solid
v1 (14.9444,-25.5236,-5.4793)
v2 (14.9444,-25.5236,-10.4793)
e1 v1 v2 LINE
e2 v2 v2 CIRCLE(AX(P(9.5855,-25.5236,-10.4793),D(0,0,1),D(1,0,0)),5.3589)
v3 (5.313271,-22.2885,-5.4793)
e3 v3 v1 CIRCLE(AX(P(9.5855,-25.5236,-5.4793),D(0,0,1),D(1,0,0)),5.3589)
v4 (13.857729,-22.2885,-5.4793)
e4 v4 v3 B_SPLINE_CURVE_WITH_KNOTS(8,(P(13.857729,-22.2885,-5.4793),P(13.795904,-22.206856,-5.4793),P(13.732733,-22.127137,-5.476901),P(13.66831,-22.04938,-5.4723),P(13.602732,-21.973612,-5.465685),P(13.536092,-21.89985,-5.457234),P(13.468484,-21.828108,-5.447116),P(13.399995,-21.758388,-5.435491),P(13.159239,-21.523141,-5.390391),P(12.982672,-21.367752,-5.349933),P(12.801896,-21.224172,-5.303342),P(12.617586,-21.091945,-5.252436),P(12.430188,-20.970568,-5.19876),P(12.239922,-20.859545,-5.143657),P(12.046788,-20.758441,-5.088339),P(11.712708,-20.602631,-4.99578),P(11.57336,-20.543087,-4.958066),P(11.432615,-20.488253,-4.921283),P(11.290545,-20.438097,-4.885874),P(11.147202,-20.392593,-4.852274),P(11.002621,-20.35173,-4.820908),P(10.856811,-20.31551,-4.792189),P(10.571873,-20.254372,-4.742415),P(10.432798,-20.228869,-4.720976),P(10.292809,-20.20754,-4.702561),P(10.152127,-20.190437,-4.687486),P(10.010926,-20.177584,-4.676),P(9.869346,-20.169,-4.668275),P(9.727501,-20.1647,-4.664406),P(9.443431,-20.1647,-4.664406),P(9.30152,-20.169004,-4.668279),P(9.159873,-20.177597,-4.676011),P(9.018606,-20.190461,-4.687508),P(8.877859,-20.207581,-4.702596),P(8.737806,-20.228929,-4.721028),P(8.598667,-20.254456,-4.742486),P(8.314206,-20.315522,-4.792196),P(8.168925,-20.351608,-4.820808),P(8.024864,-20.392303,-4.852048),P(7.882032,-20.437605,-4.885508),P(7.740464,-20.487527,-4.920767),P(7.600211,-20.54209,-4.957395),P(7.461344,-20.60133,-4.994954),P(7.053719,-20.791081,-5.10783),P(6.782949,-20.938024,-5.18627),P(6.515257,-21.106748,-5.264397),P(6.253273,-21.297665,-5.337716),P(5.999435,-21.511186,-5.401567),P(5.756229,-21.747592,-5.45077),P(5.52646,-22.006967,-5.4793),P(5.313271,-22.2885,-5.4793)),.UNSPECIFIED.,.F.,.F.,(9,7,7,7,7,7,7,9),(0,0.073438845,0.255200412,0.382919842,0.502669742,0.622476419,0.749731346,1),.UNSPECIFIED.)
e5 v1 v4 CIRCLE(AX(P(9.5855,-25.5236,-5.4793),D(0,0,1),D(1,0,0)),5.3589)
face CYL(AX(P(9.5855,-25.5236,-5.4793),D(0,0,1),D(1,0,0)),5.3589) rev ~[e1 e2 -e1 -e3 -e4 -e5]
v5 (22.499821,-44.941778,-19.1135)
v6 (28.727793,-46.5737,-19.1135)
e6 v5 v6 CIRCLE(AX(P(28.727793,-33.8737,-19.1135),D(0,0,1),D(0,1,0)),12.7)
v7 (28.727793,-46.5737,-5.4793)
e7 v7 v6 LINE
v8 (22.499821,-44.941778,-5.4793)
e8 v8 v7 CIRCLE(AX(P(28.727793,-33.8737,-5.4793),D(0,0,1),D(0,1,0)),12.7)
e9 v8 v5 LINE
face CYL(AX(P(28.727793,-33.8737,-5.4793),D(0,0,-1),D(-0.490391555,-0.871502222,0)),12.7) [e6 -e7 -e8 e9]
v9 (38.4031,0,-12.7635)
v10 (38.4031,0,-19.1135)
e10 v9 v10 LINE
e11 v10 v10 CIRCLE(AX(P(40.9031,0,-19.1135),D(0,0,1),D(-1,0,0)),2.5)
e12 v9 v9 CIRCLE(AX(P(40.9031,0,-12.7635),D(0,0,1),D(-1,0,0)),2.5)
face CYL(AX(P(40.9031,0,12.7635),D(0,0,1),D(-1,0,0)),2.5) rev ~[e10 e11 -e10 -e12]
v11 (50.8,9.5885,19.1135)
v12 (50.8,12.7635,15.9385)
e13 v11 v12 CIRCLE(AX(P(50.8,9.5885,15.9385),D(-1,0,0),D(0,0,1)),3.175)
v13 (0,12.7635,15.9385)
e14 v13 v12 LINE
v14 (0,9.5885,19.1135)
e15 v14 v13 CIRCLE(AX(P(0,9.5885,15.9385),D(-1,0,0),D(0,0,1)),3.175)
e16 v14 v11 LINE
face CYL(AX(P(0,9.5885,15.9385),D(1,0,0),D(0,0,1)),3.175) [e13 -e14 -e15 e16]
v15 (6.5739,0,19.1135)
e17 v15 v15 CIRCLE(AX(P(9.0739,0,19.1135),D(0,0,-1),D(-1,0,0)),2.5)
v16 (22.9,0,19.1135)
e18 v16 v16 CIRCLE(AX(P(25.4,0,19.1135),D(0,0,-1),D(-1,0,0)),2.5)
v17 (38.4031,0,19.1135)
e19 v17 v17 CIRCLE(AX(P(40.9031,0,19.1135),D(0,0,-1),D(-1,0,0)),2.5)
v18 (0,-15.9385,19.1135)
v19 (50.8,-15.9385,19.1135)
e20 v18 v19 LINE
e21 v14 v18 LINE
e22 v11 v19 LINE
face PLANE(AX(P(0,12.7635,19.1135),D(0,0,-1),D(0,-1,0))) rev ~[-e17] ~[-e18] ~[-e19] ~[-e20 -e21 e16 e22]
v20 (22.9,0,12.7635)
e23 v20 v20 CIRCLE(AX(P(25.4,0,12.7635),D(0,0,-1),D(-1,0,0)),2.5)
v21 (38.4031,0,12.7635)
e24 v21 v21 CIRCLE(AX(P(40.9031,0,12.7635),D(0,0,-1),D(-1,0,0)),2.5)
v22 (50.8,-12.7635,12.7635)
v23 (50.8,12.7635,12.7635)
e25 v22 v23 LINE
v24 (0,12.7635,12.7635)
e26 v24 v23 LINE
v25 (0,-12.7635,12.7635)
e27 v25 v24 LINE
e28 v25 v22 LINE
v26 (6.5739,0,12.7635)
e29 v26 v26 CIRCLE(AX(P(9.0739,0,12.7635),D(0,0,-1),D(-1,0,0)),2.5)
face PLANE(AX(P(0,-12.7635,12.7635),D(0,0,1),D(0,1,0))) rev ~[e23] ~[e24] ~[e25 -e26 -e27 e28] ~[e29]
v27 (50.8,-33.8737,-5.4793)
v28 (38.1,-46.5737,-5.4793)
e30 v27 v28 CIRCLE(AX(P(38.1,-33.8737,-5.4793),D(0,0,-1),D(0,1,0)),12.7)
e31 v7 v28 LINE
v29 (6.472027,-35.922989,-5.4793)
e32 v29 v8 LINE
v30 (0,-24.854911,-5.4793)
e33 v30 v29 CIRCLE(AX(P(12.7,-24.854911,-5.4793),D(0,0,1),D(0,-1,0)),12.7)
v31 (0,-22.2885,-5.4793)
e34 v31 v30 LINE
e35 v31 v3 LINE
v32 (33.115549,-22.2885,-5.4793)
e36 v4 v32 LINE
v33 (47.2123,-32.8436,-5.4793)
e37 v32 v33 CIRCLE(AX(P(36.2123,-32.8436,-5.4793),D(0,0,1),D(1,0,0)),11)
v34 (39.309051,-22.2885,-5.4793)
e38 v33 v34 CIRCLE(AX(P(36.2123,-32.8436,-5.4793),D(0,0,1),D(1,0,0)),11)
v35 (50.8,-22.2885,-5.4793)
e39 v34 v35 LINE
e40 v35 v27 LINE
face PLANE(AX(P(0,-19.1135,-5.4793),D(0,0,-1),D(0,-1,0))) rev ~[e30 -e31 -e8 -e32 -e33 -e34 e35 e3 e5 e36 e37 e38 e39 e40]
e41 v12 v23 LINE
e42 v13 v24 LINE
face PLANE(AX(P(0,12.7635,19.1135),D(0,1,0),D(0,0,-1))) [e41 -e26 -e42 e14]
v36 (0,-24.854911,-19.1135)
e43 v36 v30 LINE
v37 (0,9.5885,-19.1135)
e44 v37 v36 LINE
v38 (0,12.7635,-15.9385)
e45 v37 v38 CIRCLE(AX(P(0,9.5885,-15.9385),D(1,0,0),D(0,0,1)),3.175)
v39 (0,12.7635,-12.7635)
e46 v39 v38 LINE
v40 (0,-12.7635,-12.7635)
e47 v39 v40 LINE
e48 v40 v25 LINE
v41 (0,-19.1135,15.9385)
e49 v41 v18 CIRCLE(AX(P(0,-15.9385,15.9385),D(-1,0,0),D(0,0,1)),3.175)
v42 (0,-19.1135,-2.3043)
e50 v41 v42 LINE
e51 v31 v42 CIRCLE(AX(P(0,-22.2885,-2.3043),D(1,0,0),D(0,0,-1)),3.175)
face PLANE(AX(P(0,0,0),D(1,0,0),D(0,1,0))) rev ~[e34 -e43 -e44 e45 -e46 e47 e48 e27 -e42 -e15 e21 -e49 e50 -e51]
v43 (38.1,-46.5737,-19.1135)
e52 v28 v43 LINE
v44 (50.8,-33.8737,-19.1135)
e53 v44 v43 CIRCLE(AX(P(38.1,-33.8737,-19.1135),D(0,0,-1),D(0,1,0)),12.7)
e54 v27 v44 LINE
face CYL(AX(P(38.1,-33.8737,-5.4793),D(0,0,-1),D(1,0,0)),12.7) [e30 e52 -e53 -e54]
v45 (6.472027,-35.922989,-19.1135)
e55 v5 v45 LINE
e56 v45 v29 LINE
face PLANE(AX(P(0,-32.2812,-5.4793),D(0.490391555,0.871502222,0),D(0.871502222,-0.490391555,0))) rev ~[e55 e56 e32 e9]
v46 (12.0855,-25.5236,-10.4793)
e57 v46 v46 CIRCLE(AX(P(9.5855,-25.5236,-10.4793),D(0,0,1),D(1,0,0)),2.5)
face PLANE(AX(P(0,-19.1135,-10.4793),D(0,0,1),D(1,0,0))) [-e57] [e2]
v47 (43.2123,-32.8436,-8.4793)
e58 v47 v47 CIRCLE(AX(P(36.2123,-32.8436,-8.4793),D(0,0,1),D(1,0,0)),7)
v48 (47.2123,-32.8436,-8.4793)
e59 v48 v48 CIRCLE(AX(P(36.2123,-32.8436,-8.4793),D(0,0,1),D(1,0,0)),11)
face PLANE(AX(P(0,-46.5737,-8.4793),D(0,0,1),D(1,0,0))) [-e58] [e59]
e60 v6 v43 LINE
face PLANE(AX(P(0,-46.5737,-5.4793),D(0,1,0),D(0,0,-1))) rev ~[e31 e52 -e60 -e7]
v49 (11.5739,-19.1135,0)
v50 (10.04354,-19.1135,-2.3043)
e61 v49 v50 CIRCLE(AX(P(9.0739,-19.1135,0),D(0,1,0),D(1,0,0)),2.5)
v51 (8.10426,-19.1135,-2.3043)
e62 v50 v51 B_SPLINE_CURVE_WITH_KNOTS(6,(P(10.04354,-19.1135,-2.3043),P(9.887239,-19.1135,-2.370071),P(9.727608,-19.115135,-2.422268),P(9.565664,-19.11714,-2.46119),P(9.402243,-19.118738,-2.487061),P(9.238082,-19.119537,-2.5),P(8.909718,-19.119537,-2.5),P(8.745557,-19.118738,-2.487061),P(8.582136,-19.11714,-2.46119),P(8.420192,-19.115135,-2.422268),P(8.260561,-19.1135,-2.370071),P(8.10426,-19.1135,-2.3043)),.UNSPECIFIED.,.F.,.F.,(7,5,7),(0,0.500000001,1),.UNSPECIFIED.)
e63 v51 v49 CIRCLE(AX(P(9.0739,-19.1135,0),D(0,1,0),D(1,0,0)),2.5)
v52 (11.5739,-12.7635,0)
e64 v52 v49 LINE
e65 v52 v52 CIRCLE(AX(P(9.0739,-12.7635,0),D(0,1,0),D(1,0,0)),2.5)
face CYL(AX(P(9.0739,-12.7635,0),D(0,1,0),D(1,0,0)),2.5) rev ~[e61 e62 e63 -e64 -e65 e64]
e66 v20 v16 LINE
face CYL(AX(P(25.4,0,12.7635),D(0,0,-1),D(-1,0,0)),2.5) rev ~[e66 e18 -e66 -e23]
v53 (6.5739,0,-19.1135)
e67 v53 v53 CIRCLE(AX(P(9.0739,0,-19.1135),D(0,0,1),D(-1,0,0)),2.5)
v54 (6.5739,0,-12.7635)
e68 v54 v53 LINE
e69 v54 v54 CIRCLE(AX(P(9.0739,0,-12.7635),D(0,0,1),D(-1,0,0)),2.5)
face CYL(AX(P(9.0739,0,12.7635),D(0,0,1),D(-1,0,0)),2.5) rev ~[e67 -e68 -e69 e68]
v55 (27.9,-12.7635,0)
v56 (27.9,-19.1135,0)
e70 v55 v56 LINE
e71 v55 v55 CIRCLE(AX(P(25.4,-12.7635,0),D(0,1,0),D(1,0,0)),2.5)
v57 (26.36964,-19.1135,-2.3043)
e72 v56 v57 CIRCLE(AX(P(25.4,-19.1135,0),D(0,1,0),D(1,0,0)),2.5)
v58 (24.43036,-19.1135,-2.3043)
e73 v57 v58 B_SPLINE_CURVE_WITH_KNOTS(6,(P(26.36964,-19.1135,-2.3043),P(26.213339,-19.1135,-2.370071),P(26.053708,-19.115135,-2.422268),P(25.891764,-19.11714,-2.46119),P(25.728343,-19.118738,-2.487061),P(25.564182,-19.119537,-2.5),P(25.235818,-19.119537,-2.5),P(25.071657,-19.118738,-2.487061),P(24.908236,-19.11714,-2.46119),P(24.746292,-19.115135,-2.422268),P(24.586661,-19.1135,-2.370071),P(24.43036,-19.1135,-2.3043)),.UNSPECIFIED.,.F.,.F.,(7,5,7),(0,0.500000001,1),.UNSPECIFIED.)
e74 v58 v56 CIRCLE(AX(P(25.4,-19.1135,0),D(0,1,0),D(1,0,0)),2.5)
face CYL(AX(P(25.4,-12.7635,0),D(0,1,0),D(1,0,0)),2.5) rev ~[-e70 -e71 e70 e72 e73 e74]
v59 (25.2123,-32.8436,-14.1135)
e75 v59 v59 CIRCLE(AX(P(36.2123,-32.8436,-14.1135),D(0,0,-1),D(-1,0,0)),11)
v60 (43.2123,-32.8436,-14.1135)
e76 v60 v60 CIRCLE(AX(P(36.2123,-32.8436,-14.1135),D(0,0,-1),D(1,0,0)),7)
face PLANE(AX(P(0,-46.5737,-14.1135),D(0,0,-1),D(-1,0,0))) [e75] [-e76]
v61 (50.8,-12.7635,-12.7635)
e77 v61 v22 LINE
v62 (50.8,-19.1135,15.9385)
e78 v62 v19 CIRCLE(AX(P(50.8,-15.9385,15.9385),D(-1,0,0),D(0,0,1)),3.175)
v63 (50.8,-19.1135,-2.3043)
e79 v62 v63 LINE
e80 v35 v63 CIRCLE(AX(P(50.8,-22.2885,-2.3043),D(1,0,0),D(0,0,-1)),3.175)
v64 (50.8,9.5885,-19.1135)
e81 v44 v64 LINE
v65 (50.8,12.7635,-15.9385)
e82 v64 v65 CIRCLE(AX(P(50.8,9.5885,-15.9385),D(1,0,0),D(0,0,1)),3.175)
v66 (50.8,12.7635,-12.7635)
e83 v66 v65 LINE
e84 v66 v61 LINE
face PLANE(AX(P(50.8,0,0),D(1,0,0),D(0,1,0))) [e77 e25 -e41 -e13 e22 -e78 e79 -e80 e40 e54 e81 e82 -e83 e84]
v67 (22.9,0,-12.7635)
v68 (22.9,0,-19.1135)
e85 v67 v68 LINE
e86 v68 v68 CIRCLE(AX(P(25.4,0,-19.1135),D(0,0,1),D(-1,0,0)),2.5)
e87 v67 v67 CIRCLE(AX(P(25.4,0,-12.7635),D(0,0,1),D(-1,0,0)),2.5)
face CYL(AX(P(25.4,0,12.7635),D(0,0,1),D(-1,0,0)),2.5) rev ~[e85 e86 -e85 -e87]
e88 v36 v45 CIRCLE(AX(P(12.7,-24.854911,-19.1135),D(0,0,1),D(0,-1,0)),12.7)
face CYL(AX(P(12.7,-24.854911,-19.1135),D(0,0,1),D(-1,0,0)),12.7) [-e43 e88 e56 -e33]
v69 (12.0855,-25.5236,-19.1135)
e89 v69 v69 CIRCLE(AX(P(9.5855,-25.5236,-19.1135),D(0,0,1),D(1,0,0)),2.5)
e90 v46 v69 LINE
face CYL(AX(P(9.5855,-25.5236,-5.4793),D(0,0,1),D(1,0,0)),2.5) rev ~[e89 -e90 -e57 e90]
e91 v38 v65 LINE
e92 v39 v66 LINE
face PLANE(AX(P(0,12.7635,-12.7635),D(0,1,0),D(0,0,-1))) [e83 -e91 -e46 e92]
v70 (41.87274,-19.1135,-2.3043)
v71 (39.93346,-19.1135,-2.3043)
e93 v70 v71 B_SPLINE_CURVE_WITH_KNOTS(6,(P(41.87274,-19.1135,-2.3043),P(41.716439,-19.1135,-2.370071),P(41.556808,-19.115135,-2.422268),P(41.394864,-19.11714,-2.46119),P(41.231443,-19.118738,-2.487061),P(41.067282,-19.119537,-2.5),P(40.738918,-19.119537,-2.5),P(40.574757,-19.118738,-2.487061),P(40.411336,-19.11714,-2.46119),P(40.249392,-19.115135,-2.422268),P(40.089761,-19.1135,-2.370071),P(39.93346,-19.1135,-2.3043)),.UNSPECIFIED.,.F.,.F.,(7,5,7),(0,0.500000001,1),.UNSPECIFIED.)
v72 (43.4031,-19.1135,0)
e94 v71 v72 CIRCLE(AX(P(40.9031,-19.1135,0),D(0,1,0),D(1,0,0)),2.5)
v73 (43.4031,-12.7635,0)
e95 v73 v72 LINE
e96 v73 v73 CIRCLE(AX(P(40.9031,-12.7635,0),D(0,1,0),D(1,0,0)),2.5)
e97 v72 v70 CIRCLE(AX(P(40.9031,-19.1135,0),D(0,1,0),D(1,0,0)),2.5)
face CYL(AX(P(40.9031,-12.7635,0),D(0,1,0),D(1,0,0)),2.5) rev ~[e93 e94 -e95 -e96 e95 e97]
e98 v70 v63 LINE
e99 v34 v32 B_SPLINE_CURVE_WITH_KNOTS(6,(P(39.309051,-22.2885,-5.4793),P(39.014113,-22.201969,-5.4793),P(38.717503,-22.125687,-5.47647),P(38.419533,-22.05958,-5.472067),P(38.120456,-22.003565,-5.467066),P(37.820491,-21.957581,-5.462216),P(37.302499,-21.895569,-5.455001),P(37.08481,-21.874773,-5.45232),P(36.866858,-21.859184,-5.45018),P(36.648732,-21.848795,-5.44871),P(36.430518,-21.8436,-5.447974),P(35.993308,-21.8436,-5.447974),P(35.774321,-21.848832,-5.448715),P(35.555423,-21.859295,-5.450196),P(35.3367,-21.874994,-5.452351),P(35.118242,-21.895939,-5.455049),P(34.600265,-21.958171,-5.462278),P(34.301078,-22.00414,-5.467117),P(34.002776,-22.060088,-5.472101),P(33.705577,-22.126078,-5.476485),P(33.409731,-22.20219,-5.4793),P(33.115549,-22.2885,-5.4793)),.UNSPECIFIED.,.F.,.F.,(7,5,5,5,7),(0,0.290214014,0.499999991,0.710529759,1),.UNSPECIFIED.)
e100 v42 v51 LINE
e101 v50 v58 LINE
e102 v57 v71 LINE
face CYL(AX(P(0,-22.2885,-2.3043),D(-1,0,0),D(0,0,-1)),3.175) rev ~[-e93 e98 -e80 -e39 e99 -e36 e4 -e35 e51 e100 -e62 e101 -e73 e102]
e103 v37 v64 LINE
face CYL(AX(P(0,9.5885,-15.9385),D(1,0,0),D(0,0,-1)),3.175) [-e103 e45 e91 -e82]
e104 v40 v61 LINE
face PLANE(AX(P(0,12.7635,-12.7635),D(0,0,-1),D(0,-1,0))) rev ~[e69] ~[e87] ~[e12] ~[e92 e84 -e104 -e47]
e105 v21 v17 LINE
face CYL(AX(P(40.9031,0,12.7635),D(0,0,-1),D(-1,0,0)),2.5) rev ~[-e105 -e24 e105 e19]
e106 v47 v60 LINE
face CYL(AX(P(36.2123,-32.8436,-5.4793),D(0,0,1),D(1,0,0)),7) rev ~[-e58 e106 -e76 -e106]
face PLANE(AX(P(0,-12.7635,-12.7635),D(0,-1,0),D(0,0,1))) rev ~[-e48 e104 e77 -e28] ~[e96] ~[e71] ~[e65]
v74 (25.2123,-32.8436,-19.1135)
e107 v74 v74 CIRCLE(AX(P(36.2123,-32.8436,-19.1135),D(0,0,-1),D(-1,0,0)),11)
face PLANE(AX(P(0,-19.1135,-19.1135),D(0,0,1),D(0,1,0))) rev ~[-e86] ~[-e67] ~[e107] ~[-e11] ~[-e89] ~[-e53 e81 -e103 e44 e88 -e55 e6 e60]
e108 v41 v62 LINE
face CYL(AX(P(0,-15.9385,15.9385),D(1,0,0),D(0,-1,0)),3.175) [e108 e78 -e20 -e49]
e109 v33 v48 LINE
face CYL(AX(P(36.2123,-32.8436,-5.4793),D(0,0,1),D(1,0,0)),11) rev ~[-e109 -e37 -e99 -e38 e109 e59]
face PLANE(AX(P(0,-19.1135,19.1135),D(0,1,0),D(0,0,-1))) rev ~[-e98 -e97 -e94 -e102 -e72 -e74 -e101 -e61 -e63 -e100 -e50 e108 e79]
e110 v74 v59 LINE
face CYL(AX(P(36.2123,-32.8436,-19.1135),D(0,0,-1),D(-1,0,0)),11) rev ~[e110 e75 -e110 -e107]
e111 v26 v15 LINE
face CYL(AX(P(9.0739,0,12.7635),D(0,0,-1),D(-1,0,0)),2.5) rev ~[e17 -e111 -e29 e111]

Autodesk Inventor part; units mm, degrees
ref_plane "YZ Plane" through (0, 0, 0) normal (1, 0, 0) x (0, 1, 0)
ref_plane "XZ Plane" through (0, 0, 0) normal (0, 1, 0) x (-1, 0, 0)
ref_plane "XY Plane" through (0, 0, 0) normal (0, 0, 1) x (1, 0, 0)
sketch "Sketch1" plane through (0, 0, 0) normal (1, 0, 0) x (0, 1, 0)
  line L0 (-12.7635, 12.7635) -> (12.7635, 12.7635)
  line L1 (12.7635, 12.7635) -> (12.7635, -12.7635)
  line L2 (12.7635, -12.7635) -> (-12.7635, -12.7635)
  line L3 (-12.7635, -12.7635) -> (-12.7635, 12.7635)
  line L4 (-12.7635, 12.7635) -> (12.7635, -12.7635) construction
  line L5 (12.7635, 12.7635) -> (-12.7635, -12.7635) construction
  line L6 (19.1135, 19.1135) -> (-19.1135, 19.1135)
  line L7 (-19.1135, 19.1135) -> (-19.1135, -19.1135)
  line L8 (-19.1135, -19.1135) -> (19.1135, -19.1135)
  line L9 (19.1135, -19.1135) -> (19.1135, 19.1135)
  line L10 (12.7635, 19.1135) -> (12.7635, -19.1135)
  line L11 (-19.1135, -5.4793) -> (-46.5737, -5.4793)
  line L12 (-46.5737, -5.4793) -> (-46.5737, -19.1135)
  line L13 (-46.5737, -19.1135) -> (-19.1135, -19.1135)
  line L14 (-19.1135, -19.1135) -> (-19.1135, -5.4793)
  point P0 (0, 0)
  point P1 (12.7635, 12.7635)
  dimension "d1" = 25.527
  dimension "d2" = 6.35
extrude "Extrusion1" add sketch "Sketch1" along normal blind 50.8 contours L3 L2 L10 L8 L7 L6 L0 | L13 L12 L11 L7
sketch "Sketch2" plane through (0, -46.5737, -5.4793) normal (0, 0, 1) x (1, 0, 0)
  line L0 (0, 27.4602) -> (0, 0) projected
  line L1 (0, 0) -> (50.8, 0) projected
  line L2 (50.8, 27.4602) -> (50.8, 0) projected
  line L3 (0, 27.4602) -> (50.8, 27.4602) projected
  circle A0 centre (36.2123, 13.7301) radius 7
  point P0 (0, 46.5737)
  dimension "d5" = 14
extrude "Extrusion2" cut sketch "Sketch2" against normal through all contours A0
sketch "Sketch3" plane through (0, -46.5737, -19.1135) normal (0, 0, -1) x (-1, 0, 0)
  circle A0 centre (-36.2123, 13.7301) radius 7 projected
  circle A1 centre (-36.2123, 13.7301) radius 11
  point P0 (0, 46.5737)
  dimension "d8" = 22
extrude "Extrusion3" cut sketch "Sketch3" against normal blind 5
sketch "Sketch4" plane through (0, -12.7635, 12.7635) normal (0, 1, 0) x (1, 0, 0)
  line L0 (0, 25.527) -> (0, 0) projected
  line L1 (0, 0) -> (50.8, 0) projected
  line L2 (50.8, 25.527) -> (50.8, 0) projected
  line L3 (0, 25.527) -> (50.8, 25.527) projected
  line L4 (0, 12.7635) -> (50.8, 12.7635) construction
  circle A0 centre (9.0739, 12.7635) radius 2.5
  circle A1 centre (25.4, 12.7635) radius 2.5
  circle A2 centre (40.9031, 12.7635) radius 2.5
  dimension "d11" = 5
  dimension "d12" = 5
  dimension "d13" = 5
extrude "Extrusion4" cut sketch "Sketch4" against normal through all contours A0 | A1 | A2
sketch "Sketch5" plane through (0, -12.7635, 12.7635) normal (0, 0, -1) x (-1, 0, 0)
  line L0 (-43.4031, 0) -> (-38.4031, 0) projected
  line L1 (-27.9, 0) -> (-22.9, 0) projected
  line L2 (-11.5739, 0) -> (-6.5739, 0) projected
  line L3 (0, 0) -> (0, 25.527) projected
  line L4 (0, 25.527) -> (-50.8, 25.527) projected
  line L5 (-50.8, 0) -> (-50.8, 25.527) projected
  line L6 (0, 0) -> (-50.8, 0) projected
  circle A0 centre (-9.0739, 12.7635) radius 2.5
  circle A1 centre (-25.4, 12.7635) radius 2.5
  circle A2 centre (-40.9031, 12.7635) radius 2.5
  point P0 (0, 12.7635)
  dimension "d16" = 5
extrude "Extrusion5" cut sketch "Sketch5" along normal through all both and the other way through all contours A0 | A1 | A2
sketch "Sketch7" plane through (0, -46.5737, -5.4793) normal (0, 0, 1) x (1, 0, 0)
  circle A0 centre (36.2123, 13.7301) radius 7 projected
  circle A1 centre (36.2123, 13.7301) radius 11
  point P0 (0, 46.5737)
  dimension "d21" = 22
extrude "Extrusion7" cut sketch "Sketch7" against normal blind 3
sketch "Sketch8" plane through (0, -46.5737, -5.4793) normal (0, 0, 1) x (1, 0, 0)
  line L0 (0, 27.4602) -> (0, 0) projected
  circle A0 centre (36.2123, 13.7301) radius 11 projected
  line L1 (0, 27.4602) -> (0, 0) projected
  line L2 (0, 0) -> (50.8, 0) projected
  line L3 (50.8, 27.4602) -> (50.8, 0) projected
  line L4 (0, 27.4602) -> (50.8, 27.4602) projected
  circle A1 centre (9.5855, 21.0501) radius 2.5
  line L5 (0, 0) -> (0, 59.3372) projected
  line L6 (0, 14.2925) -> (25.4, 0)
  point P0 (0, 46.5737)
  point P1 (0, 14.2925)
  dimension "d24" = 5
extrude "Extrusion8" cut sketch "Sketch8" along normal through all both and the other way through all contours L6 L2 L0 | A1
fillet "Fillet1" radius 12.7 3 edges at (0, -32.2813, -12.2964) (50.8, -46.5737, -12.2964) (25.4, -46.5737, -12.2964)
sketch "Sketch9" plane through (0, -19.1135, -5.4793) normal (0, 0, 1) x (1, 0, 0)
  circle A0 centre (9.5855, -6.4101) radius 2.5 projected
  circle A1 centre (36.2123, -13.7301) radius 11 projected
  arc A2 (22.4998, -25.8283) -> (28.7278, -27.4602) centre (28.7278, -14.7602) ccw projected
  line L0 (28.7278, -27.4602) -> (38.1, -27.4602) projected
  arc A3 (38.1, -27.4602) -> (50.8, -14.7602) centre (38.1, -14.7602) ccw projected
  line L1 (50.8, 0) -> (50.8, -14.7602) projected
  line L2 (0, 0) -> (50.8, 0) projected
  line L3 (0, 0) -> (0, -5.7415) projected
  arc A4 (0, -5.7415) -> (6.472, -16.8095) centre (12.7, -5.7415) ccw projected
  line L4 (6.472, -16.8095) -> (22.4998, -25.8283) projected
  circle A5 centre (9.5855, -6.4101) radius 5.3589
  point P0 (0, 19.1135)
extrude "Extrusion9" cut sketch "Sketch9" against normal blind 5 contours A5
fillet "Fillet2" radius 3.175 1 edges at (25.4, -19.1135, -5.4793)
fillet "Fillet3" radius 3.175 3 edges at (25.4, -19.1135, 19.1135) (25.4, 12.7635, 19.1135) (25.4, 12.7635, -19.1135)
properties part number "swingarmBase"
